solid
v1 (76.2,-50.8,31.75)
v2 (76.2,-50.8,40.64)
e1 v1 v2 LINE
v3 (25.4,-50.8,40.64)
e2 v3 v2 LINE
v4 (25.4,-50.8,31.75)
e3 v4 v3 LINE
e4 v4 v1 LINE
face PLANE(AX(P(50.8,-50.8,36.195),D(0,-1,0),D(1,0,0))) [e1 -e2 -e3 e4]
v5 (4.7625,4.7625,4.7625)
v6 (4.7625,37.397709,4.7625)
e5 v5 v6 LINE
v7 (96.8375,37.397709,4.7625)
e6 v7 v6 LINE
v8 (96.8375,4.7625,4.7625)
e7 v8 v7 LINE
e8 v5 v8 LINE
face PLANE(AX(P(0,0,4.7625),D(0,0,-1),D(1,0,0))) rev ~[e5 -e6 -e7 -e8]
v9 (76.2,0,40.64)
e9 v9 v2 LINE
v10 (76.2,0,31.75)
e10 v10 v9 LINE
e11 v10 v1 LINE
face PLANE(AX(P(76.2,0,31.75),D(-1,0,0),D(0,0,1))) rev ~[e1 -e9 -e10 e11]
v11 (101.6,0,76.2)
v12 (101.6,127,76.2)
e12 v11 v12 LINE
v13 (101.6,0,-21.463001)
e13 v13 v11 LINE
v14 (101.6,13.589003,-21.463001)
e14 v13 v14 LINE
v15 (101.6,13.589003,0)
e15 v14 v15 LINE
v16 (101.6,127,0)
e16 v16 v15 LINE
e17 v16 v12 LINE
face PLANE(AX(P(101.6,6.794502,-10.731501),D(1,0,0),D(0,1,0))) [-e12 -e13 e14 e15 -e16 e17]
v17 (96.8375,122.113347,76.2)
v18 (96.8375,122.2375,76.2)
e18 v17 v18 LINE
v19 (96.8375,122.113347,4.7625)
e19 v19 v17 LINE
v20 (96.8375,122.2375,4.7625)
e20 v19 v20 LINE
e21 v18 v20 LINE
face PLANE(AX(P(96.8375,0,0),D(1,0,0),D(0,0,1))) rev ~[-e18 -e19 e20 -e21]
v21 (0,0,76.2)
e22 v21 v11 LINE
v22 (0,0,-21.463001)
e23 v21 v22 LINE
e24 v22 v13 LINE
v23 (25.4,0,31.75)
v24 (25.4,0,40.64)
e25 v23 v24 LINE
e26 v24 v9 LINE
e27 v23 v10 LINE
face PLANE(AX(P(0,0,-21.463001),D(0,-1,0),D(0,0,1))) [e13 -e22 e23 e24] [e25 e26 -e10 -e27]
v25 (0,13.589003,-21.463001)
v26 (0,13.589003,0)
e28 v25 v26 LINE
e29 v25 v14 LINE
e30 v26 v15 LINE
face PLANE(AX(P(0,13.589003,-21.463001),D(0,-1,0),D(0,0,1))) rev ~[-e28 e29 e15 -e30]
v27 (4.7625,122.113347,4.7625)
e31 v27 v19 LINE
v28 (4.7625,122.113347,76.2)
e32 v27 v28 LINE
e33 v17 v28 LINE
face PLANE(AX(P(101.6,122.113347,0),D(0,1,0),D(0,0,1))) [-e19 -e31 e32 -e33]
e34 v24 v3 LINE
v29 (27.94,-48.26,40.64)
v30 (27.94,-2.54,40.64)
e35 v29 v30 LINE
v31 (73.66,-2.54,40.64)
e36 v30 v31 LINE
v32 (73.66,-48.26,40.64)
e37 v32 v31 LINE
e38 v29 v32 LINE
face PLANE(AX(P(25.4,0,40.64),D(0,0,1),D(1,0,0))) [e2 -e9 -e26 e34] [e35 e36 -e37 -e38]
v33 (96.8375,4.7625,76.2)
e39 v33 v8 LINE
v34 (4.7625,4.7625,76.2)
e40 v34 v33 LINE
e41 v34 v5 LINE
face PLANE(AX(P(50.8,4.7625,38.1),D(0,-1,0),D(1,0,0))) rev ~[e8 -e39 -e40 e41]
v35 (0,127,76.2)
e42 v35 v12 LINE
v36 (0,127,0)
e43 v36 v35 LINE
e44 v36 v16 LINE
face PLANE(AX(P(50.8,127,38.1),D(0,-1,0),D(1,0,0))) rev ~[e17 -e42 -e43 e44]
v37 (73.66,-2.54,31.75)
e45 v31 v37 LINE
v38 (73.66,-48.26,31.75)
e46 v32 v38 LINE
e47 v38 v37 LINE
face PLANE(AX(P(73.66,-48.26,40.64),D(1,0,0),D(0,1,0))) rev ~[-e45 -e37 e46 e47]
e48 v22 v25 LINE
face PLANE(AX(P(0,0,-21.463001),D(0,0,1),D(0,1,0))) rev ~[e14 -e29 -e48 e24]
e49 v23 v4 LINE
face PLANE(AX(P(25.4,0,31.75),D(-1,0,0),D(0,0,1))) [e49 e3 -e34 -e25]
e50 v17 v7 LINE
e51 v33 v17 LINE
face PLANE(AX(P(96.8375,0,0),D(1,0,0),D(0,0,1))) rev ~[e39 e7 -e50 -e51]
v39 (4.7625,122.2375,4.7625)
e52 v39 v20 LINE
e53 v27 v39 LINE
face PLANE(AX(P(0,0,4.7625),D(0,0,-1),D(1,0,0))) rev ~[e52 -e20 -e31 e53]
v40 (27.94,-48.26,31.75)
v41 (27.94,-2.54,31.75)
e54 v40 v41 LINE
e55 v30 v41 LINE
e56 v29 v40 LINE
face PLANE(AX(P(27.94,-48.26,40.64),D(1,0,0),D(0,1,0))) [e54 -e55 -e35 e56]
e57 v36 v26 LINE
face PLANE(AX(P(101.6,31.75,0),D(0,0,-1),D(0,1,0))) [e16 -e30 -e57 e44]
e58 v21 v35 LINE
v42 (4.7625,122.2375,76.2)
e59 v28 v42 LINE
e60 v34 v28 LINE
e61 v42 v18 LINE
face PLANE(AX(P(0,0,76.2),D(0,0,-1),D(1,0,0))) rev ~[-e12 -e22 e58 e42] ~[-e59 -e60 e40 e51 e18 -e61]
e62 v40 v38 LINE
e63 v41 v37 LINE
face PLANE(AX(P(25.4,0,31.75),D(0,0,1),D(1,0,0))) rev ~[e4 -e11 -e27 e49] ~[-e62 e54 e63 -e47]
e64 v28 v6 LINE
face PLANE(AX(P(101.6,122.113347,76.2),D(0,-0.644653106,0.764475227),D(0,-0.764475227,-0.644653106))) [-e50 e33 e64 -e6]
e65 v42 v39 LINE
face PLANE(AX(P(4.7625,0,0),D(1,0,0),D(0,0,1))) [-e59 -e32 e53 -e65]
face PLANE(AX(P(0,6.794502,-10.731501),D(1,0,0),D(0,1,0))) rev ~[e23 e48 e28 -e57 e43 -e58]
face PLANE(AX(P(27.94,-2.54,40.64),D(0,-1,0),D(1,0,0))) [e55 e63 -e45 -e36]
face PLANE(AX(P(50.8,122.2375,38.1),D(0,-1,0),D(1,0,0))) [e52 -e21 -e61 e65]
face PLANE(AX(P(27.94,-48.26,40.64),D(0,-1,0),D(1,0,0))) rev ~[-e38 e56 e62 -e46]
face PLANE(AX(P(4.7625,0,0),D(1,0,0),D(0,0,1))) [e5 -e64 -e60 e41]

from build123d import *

# Parameters (mm, degrees)
F0_W      = 101.6
F0_H      = 76.2
F1_DEPTH  = 127
F2_T      = -4.7625
F4_DEPTH  = 101.6
F5_W      = 50.8
F5_H      = 8.89
F6_DEPTH  = 50.8
F7_W      = 45.72
F7_H      = 45.72
F8_DEPTH  = 25.4
F11_W     = 13.5890031233
F11_H     = 21.4630011469
F12_DEPTH = 101.6


# Not quite as in the source:
# - the program builds the solid bodies; features that only make, move or delete a surface that nothing else refers to are left out


with BuildPart() as f1:
    # F0 (on Front) → F1 (new body)
    with BuildSketch(Plane.XZ):
        with Locations((50.8, 38.1)):
            Rectangle(F0_W, F0_H)
    extrude(amount=-F1_DEPTH)

    # F2
    f2_openings = [f1.faces().sort_by_distance(p)[0] for p in [
        (50.8, 63.5, 76.2),
    ]]
    offset(amount=F2_T, openings=f2_openings)

    # F3 (on face) → F4 (join)
    with BuildSketch(Plane.YZ.offset(101.6)):
        Polygon((122.1133470535, 0), (122.1133470535, 76.2), (31.75, 0), align=None)
    extrude(amount=-F4_DEPTH)

    # F5 (on face) → F6 (join)
    with BuildSketch(Plane.XZ):
        with Locations((50.8, 36.195)):
            Rectangle(F5_W, F5_H)
    extrude(amount=F6_DEPTH)

    # F7 (on face) → F8 (cut)
    with BuildSketch(Plane.XY.offset(40.64)):
        with Locations((50.8, -25.4)):
            Rectangle(F7_W, F7_H)
    extrude(amount=-F8_DEPTH, mode=Mode.SUBTRACT)

    # F11 (on Right) → F12 (join)
    with BuildSketch(Plane.YZ):
        with Locations((6.7945015617, -10.7315005735)):
            Rectangle(F11_W, F11_H)
    extrude(amount=F12_DEPTH)


solid = f1.part
